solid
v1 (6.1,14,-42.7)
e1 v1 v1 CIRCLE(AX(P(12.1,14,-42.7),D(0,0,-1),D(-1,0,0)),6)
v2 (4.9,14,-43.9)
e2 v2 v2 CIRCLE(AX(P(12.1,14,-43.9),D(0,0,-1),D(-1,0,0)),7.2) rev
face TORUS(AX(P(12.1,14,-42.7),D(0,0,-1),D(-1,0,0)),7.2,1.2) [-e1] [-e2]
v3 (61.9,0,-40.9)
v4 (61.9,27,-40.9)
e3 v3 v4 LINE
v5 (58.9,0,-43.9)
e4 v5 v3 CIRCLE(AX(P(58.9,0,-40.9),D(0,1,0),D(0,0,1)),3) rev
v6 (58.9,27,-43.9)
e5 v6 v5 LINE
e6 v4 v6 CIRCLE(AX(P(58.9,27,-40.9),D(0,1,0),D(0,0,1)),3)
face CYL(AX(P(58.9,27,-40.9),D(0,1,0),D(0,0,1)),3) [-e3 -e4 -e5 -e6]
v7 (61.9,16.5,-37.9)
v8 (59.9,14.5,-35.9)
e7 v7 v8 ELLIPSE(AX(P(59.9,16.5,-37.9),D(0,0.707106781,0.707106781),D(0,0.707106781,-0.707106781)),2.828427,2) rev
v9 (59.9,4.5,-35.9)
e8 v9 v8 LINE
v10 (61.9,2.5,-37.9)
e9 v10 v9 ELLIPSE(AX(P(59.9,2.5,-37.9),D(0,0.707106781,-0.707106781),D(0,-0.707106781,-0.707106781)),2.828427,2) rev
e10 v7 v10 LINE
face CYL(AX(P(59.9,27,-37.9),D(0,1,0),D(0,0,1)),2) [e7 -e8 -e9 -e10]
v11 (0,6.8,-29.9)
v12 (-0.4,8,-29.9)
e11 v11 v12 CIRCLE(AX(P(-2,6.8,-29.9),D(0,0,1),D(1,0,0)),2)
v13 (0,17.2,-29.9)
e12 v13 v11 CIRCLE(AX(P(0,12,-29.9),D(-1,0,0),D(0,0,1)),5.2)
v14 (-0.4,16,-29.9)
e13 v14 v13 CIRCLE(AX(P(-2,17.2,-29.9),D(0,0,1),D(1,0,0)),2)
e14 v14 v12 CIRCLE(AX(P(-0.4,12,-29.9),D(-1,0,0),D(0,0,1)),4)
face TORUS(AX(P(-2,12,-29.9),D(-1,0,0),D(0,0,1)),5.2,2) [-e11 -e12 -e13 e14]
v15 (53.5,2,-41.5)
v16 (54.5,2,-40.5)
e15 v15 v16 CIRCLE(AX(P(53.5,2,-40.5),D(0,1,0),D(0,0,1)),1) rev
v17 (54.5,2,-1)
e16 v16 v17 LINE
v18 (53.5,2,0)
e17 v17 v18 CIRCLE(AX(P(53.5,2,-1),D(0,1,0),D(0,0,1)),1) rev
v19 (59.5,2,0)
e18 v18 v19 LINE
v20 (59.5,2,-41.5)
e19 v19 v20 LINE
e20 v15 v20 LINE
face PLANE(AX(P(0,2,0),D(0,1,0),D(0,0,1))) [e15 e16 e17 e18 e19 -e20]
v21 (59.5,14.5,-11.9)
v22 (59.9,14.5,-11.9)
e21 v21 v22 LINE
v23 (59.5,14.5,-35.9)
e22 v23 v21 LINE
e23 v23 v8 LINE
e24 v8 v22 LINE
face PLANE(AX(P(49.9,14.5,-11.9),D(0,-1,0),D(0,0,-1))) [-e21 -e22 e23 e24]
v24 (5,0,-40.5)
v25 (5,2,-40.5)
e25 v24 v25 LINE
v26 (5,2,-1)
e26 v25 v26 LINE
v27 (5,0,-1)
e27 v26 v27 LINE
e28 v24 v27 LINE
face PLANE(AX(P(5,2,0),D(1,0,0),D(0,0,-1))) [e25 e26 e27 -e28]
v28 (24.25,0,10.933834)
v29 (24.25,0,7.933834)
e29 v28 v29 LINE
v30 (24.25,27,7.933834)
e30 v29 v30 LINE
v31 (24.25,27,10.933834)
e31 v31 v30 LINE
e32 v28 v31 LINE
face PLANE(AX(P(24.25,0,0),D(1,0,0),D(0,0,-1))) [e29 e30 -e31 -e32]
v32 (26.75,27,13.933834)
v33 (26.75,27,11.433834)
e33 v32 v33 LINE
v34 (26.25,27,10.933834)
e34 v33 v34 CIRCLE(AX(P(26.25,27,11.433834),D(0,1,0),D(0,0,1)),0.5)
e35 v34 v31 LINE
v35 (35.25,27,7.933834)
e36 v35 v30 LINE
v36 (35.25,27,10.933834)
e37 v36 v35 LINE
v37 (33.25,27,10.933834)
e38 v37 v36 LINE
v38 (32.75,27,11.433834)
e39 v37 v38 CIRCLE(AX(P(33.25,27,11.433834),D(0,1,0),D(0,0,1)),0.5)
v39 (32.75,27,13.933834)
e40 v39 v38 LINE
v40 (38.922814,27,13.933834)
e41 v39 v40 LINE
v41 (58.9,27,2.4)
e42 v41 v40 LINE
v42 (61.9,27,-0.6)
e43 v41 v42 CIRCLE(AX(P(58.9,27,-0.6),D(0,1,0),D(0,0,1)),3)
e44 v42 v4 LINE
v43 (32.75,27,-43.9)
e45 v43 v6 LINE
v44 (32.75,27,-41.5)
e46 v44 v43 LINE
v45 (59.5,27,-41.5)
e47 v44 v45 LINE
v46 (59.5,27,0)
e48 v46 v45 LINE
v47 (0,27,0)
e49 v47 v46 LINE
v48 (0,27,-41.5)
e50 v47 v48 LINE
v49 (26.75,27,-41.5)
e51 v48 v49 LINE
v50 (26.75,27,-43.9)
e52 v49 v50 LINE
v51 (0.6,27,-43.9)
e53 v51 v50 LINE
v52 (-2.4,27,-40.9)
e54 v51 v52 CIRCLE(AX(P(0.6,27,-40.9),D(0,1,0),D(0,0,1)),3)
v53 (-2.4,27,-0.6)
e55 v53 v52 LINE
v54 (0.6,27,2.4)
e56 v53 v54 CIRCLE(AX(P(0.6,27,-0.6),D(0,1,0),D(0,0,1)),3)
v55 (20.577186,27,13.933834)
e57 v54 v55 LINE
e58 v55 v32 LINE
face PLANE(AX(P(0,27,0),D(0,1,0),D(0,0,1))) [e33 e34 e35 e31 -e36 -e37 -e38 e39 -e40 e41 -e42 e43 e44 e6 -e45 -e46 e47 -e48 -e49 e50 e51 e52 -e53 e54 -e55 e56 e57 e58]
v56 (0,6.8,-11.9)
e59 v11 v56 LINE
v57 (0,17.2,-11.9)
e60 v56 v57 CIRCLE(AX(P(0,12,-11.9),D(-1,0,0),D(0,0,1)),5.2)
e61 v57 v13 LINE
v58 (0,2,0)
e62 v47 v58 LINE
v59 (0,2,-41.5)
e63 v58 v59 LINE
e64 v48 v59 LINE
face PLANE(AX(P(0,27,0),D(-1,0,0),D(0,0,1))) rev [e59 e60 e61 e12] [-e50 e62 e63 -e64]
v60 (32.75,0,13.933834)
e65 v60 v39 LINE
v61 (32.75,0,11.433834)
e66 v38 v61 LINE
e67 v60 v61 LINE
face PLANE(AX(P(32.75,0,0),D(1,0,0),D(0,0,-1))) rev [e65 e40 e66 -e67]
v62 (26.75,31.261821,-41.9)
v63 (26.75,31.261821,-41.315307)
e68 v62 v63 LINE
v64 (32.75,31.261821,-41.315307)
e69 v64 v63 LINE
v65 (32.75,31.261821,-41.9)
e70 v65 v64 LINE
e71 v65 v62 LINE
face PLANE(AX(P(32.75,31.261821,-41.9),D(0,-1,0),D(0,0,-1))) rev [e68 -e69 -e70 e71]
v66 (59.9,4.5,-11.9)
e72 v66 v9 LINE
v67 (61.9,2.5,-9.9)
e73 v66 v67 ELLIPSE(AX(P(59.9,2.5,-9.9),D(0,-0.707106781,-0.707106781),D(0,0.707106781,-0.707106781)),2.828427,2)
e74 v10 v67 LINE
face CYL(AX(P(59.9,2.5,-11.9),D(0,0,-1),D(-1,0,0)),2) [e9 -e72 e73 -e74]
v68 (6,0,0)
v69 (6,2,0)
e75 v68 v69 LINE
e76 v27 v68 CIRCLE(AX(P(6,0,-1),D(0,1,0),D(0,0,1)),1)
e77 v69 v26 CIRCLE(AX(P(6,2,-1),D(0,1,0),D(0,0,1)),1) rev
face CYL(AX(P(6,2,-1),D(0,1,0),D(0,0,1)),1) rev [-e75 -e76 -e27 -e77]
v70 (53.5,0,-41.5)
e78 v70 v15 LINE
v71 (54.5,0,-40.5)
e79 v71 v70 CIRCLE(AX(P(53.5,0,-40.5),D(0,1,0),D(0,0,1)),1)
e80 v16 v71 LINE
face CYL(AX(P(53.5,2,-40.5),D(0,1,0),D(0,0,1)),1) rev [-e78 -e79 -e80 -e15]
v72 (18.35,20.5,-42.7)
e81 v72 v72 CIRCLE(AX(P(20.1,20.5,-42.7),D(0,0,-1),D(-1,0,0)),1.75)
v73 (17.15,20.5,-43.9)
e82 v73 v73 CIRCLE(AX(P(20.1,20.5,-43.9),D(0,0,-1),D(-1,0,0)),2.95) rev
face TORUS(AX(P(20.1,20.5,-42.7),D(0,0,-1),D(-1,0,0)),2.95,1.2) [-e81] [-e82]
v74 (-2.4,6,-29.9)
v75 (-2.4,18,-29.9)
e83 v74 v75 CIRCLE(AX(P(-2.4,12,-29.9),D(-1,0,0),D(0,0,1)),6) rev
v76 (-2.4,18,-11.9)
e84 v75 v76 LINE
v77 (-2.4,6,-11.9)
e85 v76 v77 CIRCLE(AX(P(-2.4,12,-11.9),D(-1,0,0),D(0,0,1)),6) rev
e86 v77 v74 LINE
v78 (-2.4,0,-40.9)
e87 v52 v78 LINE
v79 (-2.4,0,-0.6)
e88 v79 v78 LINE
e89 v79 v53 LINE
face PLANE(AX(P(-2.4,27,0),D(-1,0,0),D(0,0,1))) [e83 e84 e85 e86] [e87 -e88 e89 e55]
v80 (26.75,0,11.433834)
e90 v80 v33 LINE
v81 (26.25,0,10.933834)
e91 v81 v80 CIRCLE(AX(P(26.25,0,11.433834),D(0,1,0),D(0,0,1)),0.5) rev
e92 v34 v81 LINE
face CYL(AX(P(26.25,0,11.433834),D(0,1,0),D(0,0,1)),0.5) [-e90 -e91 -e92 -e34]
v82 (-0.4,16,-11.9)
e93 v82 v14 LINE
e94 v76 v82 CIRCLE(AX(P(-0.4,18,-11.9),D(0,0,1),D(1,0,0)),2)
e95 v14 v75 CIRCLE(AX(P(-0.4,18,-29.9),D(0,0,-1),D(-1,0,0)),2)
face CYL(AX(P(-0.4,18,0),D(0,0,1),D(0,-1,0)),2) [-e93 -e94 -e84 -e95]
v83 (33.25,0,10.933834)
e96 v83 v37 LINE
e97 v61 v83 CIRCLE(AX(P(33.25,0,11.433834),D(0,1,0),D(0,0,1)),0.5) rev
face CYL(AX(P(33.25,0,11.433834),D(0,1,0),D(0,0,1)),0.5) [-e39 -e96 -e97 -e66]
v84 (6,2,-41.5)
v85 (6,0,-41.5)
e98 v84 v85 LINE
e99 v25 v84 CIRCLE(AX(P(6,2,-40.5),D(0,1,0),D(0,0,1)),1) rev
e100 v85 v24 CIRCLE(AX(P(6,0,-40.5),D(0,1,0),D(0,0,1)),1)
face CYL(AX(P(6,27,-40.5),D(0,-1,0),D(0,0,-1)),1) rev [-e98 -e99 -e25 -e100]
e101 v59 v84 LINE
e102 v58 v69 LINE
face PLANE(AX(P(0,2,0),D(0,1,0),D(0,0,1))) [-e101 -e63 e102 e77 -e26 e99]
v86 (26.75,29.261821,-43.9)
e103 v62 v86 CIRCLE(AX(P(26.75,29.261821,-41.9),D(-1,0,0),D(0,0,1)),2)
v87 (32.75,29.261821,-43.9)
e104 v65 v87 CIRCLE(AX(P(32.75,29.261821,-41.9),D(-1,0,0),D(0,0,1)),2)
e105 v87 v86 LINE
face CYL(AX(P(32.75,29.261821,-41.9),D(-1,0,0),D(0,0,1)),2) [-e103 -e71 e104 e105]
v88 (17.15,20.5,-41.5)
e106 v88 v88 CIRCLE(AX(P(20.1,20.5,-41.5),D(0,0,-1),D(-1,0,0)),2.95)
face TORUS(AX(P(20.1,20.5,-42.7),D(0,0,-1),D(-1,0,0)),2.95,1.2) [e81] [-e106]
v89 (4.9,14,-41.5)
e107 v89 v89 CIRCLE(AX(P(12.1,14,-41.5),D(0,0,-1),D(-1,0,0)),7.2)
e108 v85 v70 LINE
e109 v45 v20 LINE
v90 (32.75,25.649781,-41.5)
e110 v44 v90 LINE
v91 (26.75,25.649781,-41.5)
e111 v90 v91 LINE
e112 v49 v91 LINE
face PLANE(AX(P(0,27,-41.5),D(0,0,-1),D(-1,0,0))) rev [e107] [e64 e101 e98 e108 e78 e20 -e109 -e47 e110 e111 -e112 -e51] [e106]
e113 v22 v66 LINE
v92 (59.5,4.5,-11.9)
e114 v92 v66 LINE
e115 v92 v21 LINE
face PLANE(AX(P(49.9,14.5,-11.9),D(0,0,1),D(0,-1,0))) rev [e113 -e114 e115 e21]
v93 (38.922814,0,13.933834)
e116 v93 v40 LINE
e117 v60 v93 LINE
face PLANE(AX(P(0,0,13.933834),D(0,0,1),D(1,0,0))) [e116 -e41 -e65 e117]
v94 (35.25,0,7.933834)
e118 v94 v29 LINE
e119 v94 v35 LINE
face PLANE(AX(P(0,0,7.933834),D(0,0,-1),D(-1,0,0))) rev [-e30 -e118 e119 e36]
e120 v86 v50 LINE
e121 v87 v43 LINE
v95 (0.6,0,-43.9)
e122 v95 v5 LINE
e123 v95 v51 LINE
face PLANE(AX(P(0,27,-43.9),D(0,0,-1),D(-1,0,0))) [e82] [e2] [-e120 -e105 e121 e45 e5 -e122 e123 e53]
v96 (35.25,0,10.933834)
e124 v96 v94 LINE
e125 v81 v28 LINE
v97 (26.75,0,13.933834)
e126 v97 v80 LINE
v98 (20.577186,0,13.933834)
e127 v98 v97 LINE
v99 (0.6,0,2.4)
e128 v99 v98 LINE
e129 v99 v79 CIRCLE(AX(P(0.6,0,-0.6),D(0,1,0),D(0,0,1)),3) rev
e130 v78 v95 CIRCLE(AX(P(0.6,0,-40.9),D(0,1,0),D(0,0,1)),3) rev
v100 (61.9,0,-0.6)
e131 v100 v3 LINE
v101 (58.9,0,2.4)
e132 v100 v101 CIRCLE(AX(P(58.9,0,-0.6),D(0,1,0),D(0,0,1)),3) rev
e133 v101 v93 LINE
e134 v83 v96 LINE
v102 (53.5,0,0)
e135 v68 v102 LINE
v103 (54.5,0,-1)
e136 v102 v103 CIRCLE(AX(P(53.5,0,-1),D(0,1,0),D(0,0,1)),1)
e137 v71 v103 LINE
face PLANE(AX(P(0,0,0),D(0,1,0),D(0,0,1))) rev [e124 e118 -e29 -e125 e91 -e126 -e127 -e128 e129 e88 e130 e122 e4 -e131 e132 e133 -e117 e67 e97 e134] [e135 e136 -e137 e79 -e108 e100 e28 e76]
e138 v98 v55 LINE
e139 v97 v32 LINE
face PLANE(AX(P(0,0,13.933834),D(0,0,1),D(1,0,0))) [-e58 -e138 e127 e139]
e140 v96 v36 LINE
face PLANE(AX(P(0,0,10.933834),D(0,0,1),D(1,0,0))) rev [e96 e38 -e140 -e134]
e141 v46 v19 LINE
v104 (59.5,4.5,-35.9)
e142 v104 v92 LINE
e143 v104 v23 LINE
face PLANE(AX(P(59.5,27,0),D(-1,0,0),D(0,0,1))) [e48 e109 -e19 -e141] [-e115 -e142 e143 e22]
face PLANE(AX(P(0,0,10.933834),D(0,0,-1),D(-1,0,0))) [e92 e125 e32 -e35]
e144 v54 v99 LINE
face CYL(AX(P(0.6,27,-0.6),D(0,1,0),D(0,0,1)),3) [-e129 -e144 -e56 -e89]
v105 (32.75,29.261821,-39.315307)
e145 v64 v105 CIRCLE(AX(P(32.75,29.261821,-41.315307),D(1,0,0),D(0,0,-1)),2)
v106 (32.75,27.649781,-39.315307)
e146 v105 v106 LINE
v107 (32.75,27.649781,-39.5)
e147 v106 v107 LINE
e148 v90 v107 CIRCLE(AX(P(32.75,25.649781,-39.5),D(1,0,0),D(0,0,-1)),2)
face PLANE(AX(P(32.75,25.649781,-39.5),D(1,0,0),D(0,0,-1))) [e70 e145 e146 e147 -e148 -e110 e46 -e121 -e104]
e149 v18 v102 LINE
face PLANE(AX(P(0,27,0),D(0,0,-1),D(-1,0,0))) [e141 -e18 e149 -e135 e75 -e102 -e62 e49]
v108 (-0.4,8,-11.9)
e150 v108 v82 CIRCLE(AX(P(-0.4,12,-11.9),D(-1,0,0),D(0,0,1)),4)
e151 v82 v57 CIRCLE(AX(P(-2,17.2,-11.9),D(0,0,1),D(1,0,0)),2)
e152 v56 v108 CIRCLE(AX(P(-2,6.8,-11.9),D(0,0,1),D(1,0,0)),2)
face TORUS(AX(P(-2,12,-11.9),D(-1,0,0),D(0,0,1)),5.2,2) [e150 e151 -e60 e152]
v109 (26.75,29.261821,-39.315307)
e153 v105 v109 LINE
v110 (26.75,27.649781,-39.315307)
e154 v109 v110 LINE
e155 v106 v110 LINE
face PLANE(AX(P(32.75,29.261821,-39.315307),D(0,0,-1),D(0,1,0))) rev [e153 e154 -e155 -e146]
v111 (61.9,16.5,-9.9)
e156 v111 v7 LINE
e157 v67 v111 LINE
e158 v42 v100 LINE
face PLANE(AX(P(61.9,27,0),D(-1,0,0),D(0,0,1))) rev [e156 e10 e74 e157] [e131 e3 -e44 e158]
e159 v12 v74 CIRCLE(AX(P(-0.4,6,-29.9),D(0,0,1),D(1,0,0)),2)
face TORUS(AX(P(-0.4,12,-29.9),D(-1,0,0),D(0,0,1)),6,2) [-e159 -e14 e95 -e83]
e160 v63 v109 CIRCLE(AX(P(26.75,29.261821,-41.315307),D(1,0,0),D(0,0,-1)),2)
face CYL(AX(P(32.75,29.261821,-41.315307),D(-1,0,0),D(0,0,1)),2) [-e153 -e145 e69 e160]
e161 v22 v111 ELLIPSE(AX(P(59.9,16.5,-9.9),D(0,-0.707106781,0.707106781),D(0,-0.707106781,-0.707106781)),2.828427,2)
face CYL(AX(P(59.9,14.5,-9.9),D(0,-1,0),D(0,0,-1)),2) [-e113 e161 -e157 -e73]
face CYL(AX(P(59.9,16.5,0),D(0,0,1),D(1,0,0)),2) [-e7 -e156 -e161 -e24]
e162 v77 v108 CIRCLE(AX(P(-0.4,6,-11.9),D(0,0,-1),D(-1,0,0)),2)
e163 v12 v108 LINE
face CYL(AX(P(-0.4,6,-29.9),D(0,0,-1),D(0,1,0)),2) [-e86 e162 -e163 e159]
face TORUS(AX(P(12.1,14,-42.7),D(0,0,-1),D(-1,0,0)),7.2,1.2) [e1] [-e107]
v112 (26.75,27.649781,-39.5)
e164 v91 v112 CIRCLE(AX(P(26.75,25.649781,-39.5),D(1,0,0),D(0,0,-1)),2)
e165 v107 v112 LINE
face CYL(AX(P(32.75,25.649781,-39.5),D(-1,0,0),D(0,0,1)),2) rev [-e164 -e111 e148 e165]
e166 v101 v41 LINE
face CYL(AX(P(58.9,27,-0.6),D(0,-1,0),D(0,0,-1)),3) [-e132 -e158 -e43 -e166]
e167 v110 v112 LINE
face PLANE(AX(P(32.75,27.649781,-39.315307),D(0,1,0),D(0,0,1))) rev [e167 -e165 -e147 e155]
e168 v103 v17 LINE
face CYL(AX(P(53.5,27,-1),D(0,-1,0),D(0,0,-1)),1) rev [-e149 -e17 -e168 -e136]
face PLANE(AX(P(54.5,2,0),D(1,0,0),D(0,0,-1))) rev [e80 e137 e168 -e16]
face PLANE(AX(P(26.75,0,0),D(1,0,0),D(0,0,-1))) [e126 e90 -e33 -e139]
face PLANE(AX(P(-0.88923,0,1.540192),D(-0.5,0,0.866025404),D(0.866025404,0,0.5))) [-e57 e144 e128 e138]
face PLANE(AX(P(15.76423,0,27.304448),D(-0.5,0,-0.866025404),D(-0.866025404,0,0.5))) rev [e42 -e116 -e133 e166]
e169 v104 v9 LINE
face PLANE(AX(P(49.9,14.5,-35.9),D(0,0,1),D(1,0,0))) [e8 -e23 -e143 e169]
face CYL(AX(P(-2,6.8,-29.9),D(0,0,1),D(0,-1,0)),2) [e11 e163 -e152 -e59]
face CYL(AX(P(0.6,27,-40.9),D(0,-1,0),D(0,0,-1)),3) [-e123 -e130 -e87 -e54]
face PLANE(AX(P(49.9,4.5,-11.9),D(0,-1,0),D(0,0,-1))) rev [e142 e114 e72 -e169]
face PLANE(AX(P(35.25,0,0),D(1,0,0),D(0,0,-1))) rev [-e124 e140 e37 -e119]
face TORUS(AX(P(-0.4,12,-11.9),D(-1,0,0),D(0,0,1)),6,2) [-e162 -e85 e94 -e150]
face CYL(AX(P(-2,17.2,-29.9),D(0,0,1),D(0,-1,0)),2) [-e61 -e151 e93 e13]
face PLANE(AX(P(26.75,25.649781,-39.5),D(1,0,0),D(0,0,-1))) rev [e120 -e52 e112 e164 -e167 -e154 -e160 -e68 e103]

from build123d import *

# Parameters (mm, degrees)
SKETCH_1_W          = 64.3
SKETCH_1_H          = 46.3
SKETCH_1_W_2        = 59.5
SKETCH_1_H_2        = 41.5
EXTRUDE_2_DEPTH     = 27
SKETCH_1_3_W        = 5
SKETCH_1_3_H        = 41.5
EXTRUDE_3_DEPTH     = 2
FILLET_1_R          = 3
FILLET_2_R          = 1
SKETCH_2_R          = 6
SKETCH_2_R_2        = 1.75
CUT_EXTRUDE_2_DEPTH = 8
SKETCH_4_W          = 24
SKETCH_4_H          = 10
CUT_EXTRUDE_4_DEPTH = 12
FILLET_5_R          = 2
CUT_EXTRUDE_5_DEPTH = 12
FILLET_6_R          = 2
FILLET_7_R          = 2
FILLET_16_R         = 1.2
EXTRUDE_9_DEPTH     = 3
EXTRUDE_11_DEPTH    = 27
CUT_EXTRUDE_6_DEPTH = 81.54700491
FILLET_17_R         = 0.5


# Some blends are built 0.0001 mm under size
with BuildPart() as part:
    # Эскиз1 → Бобышка-Вытянуть2 (new body)
    with BuildSketch(Plane(origin=(0, 0, 0), x_dir=(1, 0, 0), z_dir=(0, 1, 0))):
        with Locations((29.75, 20.75)):
            Rectangle(SKETCH_1_W, SKETCH_1_H)
        with Locations((29.75, 20.75)):
            Rectangle(SKETCH_1_W_2, SKETCH_1_H_2, mode=Mode.SUBTRACT)
    extrude(amount=EXTRUDE_2_DEPTH)

    # Эскиз1<3> → Бобышка-Вытянуть3 (add)
    with BuildSketch(Plane(origin=(0, 0, 0), x_dir=(1, 0, 0), z_dir=(0, 1, 0))):
        with Locations((2.5, 20.75)):
            Rectangle(SKETCH_1_3_W, SKETCH_1_3_H)
        with Locations((57, 20.75)):
            Rectangle(SKETCH_1_3_W, SKETCH_1_3_H)
    extrude(amount=EXTRUDE_3_DEPTH)

    # Скругление1
    fillet_1_edges = [part.edges().sort_by_distance(p)[0] for p in [
        (-2.4, 13.5, -43.9),
        (61.9, 13.5, -43.9),
        (61.9, 13.5, 2.4),
        (-2.4, 13.5, 2.4),
    ]]
    fillet(fillet_1_edges, radius=FILLET_1_R)

    # Скругление2
    fillet_2_edges = [part.edges().sort_by_distance(p)[0] for p in [
        (5, 1, 0),
        (5, 1, -41.5),
        (54.5, 1, -41.5),
        (54.5, 1, 0),
    ]]
    fillet(fillet_2_edges, radius=FILLET_2_R)

    # Эскиз2 → Вырез-Вытянуть2 (cut)
    with BuildSketch(Plane(origin=(0, 0, -43.9), x_dir=(-1, 0, 0), z_dir=(0, 0, -1))):
        with Locations((-12.1, 14)):
            Circle(SKETCH_2_R)
        with Locations((-20.1, 20.5)):
            Circle(SKETCH_2_R_2)
    extrude(amount=-CUT_EXTRUDE_2_DEPTH, mode=Mode.SUBTRACT)

    # Эскиз4 → Вырез-Вытянуть4 (cut)
    with BuildSketch(Plane(origin=(61.9, 0, 0), x_dir=(0, 0, -1), z_dir=(1, 0, 0))):
        with Locations((23.9, 9.5)):
            Rectangle(SKETCH_4_W, SKETCH_4_H)
    extrude(amount=-CUT_EXTRUDE_4_DEPTH, mode=Mode.SUBTRACT)

    # Скругление5
    fillet_5_edges = [part.edges().sort_by_distance(p)[0] for p in [
        (61.9, 14.5, -23.9),
        (61.9, 9.5, -35.9),
        (61.9, 9.5, -11.9),
        (61.9, 4.5, -23.9),
    ]]
    fillet(fillet_5_edges, radius=FILLET_5_R)

    # Эскиз10 → Вырез-Вытянуть5 (cut)
    with BuildSketch(Plane.ZY.offset(2.4)):
        with BuildLine():
            Line((-29.9, 16), (-11.9, 16))
            ThreePointArc((-11.9, 16), (-7.9, 12), (-11.9, 8))
            Line((-11.9, 8), (-29.9, 8))
            ThreePointArc((-29.9, 8), (-33.9, 12), (-29.9, 16))
        make_face()
    extrude(amount=-CUT_EXTRUDE_5_DEPTH, mode=Mode.SUBTRACT)

    # Скругление6
    fillet_6_edges = [part.edges().sort_by_distance(p)[0] for p in [
        (-2.4, 16, -20.9),
        (-2.4, 12, -33.9),
        (-2.4, 8, -20.9),
        (-2.4, 12, -7.9),
    ]]
    fillet(fillet_6_edges, radius=FILLET_6_R)

    # Скругление7
    # the kernel refuses this fillet: 2 mm, written as the material it takes off along each edge
    with BuildSketch(Plane(origin=(0, 8, -29.9), x_dir=(-1, 0, 0), z_dir=(0, 0, 1)), Plane(origin=(0, 16, -11.9), x_dir=(-1, 0, 0), z_dir=(0, 0, -1))) as fillet_7_piece_1:
        with BuildLine():
            CenterArc((2, 1.2), FILLET_7_R, 180, 36.869897646)
            Line((0, 1.2), (-0.04, 1.2))
            Line((-0.04, 1.2), (-0.04, 0))
            Line((-0.04, 0), (0, -0.04))
            ThreePointArc((0, -0.04), (0.2, -0.04), (0.368, -0.024))
            Line((0.368, -0.024), (0.4, 0))
        make_face()
    extrude(amount=18, mode=Mode.SUBTRACT)
    with BuildSketch(Plane(origin=(0, 12, -29.9), x_dir=(0, 1, 0), z_dir=(0, 0, 1))) as fillet_7_piece_2:
        with BuildLine():
            CenterArc((5.2, 2), FILLET_7_R, 233.130102354, 36.869897646)
            Line((5.2, 0), (5.2, -0.04))
            Line((5.2, -0.04), (4, -0.04))
            Line((4, -0.04), (3.96, 0))
            ThreePointArc((3.96, 0), (3.96, 0.2), (3.976, 0.368))
            Line((3.976, 0.368), (4, 0.4))
        make_face()
    revolve(axis=Axis((0, 12, -29.9), (-1, 0, 0)), revolution_arc=180, mode=Mode.SUBTRACT)
    with BuildSketch(Plane(origin=(0, 12, -11.9), x_dir=(0, -1, 0), z_dir=(0, 0, -1))) as fillet_7_piece_3:
        with BuildLine():
            CenterArc((5.2, 2), FILLET_7_R, 233.130102354, 36.869897646)
            Line((5.2, 0), (5.2, -0.04))
            Line((5.2, -0.04), (4, -0.04))
            Line((4, -0.04), (3.96, 0))
            ThreePointArc((3.96, 0), (3.96, 0.2), (3.976, 0.368))
            Line((3.976, 0.368), (4, 0.4))
        make_face()
    revolve(axis=Axis((0, 12, -11.9), (-1, 0, 0)), revolution_arc=180, mode=Mode.SUBTRACT)

    # Скругление16
    fillet_16_edges = [part.edges().sort_by_distance(p)[0] for p in [
        (18.1, 14, -41.5),
        (18.1, 14, -43.9),
        (21.85, 20.5, -41.5),
        (21.85, 20.5, -43.9),
    ]]
    fillet(fillet_16_edges, radius=FILLET_16_R - 0.0001)  # a hair under: the kernel refuses the full size

    # Эскиз16 → Бобышка-Вытянуть9 (add, symmetric)
    with BuildSketch(Plane(origin=(29.75, 0, 0), x_dir=(0, 0, -1), z_dir=(1, 0, 0))):
        with BuildLine():
            Line((43.9, 29.261820769), (43.9, 24.626856239))
            Line((43.9, 24.626856239), (41.5, 24.626856239))
            Line((41.5, 24.626856239), (41.5, 25.649781137))
            ThreePointArc((41.5, 25.649781137), (40.914213562, 27.063994699), (39.5, 27.649781137))
            Line((39.5, 27.649781137), (39.315307367, 27.649781137))
            Line((39.315307367, 27.649781137), (39.315307367, 29.261820769))
            ThreePointArc((39.315307367, 29.261820769), (39.901093805, 30.676034332), (41.315307367, 31.261820769))
            Line((41.315307367, 31.261820769), (41.9, 31.261820769))
            ThreePointArc((41.9, 31.261820769), (43.314213562, 30.676034332), (43.9, 29.261820769))
        make_face()
    extrude(amount=EXTRUDE_9_DEPTH, both=True)

    # Эскиз17 → Бобышка-Вытянуть11 (add)
    with BuildSketch(Plane(origin=(0, 27, 0), x_dir=(1, 0, 0), z_dir=(0, 1, 0))):
        Polygon((54.9, -2.4), (29.75, -2.4), (29.75, -11.933833698), (38.386915645, -11.933833698), align=None)
        Polygon((29.75, -2.4), (4.6, -2.4), (21.113084355, -11.933833698), (29.75, -11.933833698), align=None)
        Polygon((29.75, -11.933833698), (29.75, -13.933833698), (38.92281403, -13.933833698), (58.9, -2.4), (54.9, -2.4), (38.386915645, -11.933833698), align=None)
        Polygon((4.6, -2.4), (0.6, -2.4), (20.57718597, -13.933833698), (29.75, -13.933833698), (29.75, -11.933833698), (21.113084355, -11.933833698), align=None)
    extrude(amount=-EXTRUDE_11_DEPTH)

    # Эскиз19 → Вырез-Вытянуть6 (cut, through all)
    with BuildSketch(Plane(origin=(0, 27, 0), x_dir=(1, 0, 0), z_dir=(0, 1, 0))):
        Polygon((26.75, -10.933833698), (26.75, -13.933833698), (29.75, -13.933833698), (29.75, -7.933833698), (24.25, -7.933833698), (24.25, -10.933833698), align=None)
        Polygon((29.75, -7.933833698), (29.75, -13.933833698), (32.75, -13.933833698), (32.75, -10.933833698), (35.25, -10.933833698), (35.25, -7.933833698), align=None)
    extrude(amount=-CUT_EXTRUDE_6_DEPTH, mode=Mode.SUBTRACT)

    # Скругление17
    fillet_17_edges = [part.edges().sort_by_distance(p)[0] for p in [
        (26.75, 13.5, 10.933833698),
        (32.75, 13.5, 10.933833698),
    ]]
    fillet(fillet_17_edges, radius=FILLET_17_R)


solid = part.part
